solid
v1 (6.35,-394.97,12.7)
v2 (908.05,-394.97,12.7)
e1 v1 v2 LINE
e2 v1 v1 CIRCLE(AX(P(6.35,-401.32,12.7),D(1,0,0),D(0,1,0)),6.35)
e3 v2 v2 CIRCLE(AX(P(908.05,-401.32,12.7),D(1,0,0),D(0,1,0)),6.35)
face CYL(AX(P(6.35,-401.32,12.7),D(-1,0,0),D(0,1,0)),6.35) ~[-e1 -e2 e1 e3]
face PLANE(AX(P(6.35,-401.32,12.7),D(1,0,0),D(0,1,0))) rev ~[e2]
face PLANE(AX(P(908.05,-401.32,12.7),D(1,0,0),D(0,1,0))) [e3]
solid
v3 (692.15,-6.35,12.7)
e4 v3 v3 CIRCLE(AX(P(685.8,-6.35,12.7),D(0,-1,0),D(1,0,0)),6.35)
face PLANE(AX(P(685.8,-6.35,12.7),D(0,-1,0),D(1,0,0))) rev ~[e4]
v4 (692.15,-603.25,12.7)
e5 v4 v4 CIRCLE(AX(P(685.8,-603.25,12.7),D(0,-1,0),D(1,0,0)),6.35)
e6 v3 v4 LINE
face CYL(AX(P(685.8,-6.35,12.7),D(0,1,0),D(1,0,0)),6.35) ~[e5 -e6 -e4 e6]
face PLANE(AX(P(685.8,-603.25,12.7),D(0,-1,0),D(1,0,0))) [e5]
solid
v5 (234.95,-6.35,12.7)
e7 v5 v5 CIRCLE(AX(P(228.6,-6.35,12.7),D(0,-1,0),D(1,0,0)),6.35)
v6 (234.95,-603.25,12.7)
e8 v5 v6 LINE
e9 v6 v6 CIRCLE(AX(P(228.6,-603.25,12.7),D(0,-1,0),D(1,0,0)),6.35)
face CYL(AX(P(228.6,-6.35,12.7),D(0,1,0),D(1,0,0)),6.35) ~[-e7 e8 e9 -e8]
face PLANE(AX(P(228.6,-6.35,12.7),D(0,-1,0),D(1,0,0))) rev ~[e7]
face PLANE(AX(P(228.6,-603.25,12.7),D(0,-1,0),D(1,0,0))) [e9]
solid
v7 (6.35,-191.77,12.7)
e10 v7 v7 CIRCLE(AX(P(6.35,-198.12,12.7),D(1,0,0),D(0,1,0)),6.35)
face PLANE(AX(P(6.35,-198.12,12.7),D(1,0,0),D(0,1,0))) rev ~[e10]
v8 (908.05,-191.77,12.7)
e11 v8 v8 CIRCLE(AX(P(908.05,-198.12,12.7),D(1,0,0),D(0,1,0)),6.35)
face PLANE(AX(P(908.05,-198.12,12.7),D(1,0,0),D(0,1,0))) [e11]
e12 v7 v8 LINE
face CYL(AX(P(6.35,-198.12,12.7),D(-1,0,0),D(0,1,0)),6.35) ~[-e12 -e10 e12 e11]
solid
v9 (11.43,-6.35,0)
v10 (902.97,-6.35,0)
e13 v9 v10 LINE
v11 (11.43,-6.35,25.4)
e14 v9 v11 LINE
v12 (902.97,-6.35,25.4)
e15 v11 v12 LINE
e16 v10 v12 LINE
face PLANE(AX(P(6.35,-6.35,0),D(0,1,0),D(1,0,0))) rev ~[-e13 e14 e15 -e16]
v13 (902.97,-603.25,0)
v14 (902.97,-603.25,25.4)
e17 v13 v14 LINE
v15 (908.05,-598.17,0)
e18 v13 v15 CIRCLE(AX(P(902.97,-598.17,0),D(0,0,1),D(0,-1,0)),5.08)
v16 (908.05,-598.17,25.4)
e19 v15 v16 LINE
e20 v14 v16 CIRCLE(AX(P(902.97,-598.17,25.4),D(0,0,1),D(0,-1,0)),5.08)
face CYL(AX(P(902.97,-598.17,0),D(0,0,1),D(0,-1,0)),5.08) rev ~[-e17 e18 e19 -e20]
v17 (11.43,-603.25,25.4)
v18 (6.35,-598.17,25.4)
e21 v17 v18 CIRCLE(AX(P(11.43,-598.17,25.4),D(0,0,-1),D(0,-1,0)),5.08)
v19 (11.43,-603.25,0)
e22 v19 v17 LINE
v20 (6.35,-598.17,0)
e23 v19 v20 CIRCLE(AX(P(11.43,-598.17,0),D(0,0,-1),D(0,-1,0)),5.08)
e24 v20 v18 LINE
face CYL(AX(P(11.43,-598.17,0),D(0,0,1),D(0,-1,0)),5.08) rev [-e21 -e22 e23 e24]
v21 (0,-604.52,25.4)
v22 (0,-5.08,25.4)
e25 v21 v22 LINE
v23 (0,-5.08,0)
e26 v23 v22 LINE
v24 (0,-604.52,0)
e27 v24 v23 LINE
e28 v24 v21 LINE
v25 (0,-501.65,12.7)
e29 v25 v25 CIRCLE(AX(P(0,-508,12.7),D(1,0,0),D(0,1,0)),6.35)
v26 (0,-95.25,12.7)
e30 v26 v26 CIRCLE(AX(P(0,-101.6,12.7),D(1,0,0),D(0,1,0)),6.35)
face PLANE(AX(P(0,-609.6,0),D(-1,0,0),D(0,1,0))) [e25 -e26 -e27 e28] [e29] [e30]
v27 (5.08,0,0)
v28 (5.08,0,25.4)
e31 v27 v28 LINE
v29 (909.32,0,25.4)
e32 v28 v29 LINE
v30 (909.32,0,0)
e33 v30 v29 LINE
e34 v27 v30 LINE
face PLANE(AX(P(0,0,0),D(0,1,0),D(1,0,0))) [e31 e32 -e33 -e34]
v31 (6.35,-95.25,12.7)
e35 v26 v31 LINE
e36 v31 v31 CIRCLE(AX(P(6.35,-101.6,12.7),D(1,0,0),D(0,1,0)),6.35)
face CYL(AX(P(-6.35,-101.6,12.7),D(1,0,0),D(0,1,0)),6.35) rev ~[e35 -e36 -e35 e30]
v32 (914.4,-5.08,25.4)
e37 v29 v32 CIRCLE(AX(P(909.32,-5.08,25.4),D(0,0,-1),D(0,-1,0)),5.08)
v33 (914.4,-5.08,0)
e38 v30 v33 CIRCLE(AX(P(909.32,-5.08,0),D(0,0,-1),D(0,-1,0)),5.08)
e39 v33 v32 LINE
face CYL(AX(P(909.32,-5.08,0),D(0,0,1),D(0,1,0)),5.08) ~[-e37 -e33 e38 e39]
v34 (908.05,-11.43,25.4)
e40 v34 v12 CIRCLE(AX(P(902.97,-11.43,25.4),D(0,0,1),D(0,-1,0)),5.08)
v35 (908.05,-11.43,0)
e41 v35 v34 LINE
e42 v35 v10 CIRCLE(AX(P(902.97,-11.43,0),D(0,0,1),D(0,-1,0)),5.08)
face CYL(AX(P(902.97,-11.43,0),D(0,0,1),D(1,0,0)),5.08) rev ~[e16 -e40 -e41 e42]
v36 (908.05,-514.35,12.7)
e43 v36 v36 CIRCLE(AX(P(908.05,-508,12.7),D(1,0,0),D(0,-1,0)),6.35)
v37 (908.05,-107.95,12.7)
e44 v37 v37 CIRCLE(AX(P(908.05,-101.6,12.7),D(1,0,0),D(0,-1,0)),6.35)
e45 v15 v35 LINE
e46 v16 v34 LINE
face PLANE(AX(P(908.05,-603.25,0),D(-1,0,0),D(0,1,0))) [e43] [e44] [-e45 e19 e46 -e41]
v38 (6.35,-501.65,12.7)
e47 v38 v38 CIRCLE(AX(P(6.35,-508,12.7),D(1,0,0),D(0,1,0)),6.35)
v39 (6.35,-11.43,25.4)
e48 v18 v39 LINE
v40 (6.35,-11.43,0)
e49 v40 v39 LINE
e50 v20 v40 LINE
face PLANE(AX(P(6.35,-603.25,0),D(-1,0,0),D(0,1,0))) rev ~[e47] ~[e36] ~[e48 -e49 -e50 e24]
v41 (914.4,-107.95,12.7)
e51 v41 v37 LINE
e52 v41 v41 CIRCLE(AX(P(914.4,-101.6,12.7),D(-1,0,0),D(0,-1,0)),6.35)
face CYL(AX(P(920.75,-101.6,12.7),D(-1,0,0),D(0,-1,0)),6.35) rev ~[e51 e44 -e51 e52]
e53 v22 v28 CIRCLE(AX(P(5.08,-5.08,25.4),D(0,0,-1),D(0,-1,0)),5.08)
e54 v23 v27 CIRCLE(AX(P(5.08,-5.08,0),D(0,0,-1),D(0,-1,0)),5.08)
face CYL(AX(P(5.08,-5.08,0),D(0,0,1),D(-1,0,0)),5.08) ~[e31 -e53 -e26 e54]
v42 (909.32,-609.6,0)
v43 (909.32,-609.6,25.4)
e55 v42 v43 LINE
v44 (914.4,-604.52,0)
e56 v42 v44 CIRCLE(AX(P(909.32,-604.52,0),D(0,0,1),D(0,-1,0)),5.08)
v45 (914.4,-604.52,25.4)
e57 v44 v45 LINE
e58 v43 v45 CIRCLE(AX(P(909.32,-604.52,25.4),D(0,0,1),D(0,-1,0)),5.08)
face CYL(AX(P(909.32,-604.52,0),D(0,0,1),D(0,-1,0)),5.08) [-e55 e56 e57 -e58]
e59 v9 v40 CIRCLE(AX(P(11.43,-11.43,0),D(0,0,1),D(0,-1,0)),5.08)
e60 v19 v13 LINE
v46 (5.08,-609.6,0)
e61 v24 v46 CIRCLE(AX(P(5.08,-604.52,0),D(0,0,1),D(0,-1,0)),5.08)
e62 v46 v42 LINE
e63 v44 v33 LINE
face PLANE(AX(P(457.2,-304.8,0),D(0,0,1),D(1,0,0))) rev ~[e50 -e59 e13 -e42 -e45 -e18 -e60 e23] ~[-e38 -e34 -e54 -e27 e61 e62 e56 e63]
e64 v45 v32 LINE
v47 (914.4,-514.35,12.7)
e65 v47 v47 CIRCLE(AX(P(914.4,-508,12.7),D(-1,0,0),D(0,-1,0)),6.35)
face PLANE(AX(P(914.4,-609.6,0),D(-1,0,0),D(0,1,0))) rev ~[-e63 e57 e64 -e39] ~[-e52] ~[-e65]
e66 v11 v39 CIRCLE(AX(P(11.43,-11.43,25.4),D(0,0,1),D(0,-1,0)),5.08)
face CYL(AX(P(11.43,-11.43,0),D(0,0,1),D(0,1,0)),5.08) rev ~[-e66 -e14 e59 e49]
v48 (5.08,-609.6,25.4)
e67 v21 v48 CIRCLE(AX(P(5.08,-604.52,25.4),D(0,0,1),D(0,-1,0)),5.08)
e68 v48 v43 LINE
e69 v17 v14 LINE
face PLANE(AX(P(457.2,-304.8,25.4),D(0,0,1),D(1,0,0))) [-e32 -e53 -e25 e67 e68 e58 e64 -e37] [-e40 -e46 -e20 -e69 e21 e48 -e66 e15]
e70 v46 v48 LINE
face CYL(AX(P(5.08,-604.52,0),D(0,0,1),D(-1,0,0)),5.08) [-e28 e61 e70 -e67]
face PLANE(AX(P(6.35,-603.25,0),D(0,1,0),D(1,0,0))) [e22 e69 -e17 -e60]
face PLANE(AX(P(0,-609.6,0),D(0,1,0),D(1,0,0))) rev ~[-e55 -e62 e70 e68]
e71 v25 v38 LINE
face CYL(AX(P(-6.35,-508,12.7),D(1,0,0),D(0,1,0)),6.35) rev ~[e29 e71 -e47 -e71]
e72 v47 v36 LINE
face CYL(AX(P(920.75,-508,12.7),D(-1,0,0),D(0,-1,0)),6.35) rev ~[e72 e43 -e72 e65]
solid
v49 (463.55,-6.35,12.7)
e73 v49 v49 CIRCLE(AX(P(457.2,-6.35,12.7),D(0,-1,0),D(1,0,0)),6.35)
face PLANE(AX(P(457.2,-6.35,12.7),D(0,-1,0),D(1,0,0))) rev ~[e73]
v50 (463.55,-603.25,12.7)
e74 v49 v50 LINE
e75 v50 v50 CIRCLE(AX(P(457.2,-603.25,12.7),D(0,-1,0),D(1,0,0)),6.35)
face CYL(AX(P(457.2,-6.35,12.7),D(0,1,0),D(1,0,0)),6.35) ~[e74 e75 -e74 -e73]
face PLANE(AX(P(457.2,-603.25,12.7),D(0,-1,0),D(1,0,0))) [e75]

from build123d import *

# Parameters (mm, degrees)
F0_W      = 914.4
F0_H      = 609.6
F0_W_2    = 901.7
F0_H_2    = 596.9
F1_DEPTH  = 25.4
F2_R      = 5.08
F3_R      = 6.35
F4_DEPTH  = 901.7
F5_R      = 6.35
F6_DEPTH  = 596.9
F8_D      = 12.7
F8_DEPTH  = 6.35
F8_TIP    = 3.8154649308
F10_D     = 12.7
F10_DEPTH = 6.35
F10_TIP   = 3.8154649308


# Not quite as in the source:
# - a length typed as a fraction of an inch, garbled in the dataset ("3 / 203.2 mm" for 3/8 in), is restored


with BuildPart() as f1:
    # F0 (on Top) → F1 (new body)
    with BuildSketch(Plane.XY):
        with Locations((457.2, -304.8)):
            Rectangle(F0_W, F0_H)
        with Locations((457.2, -304.8)):
            Rectangle(F0_W_2, F0_H_2, mode=Mode.SUBTRACT)
    extrude(amount=F1_DEPTH)

    # F2
    f2_edges = [f1.edges().sort_by_distance(p)[0] for p in [
        (914.4, 0, 12.7),
        (908.05, -603.25, 12.7),
        (0, 0, 12.7),
        (6.35, -603.25, 12.7),
        (914.4, -609.6, 12.7),
        (0, -609.6, 12.7),
        (908.05, -6.35, 12.7),
        (6.35, -6.35, 12.7),
    ]]
    fillet(f2_edges, radius=F2_R)

    # F8
    with Locations(Plane(origin=(0, 0, 0), x_dir=(0, -1, 0), z_dir=(-1, 0, 0))):
        with Locations((101.6, 12.7), (508, 12.7)):
            Hole(F8_D / 2, depth=F8_DEPTH)
            with Locations((0, 0, -(F8_DEPTH + F8_TIP / 2))):  # 118° drill point
                Cone(0, F8_D / 2, F8_TIP, mode=Mode.SUBTRACT)

    # F10
    with Locations(Plane.YZ.offset(914.4)):
        with Locations((-508, 12.7), (-101.6, 12.7)):
            Hole(F10_D / 2, depth=F10_DEPTH)
            with Locations((0, 0, -(F10_DEPTH + F10_TIP / 2))):  # 118° drill point
                Cone(0, F10_D / 2, F10_TIP, mode=Mode.SUBTRACT)


with BuildPart() as f4:
    # F3 (on face) → F4 (new body, through all)
    with BuildSketch(Plane.YZ.offset(6.35)):
        with Locations((-401.32, 12.7)):
            Circle(F3_R)
    extrude(amount=F4_DEPTH)


with BuildPart() as f4b:
    # F3 (on face) → F4, piece 2 (new body, through all)
    with BuildSketch(Plane.YZ.offset(6.35)):
        with Locations((-198.12, 12.7)):
            Circle(F3_R)
    extrude(amount=F4_DEPTH)


with BuildPart() as f6:
    # F5 (on face) → F6 (new body, through all)
    with BuildSketch(Plane.XZ.offset(6.35)):
        with Locations((228.6, 12.7)):
            Circle(F5_R)
    extrude(amount=F6_DEPTH)


with BuildPart() as f6b:
    # F5 (on face) → F6, piece 2 (new body, through all)
    with BuildSketch(Plane.XZ.offset(6.35)):
        with Locations((457.2, 12.7)):
            Circle(F5_R)
    extrude(amount=F6_DEPTH)


with BuildPart() as f6c:
    # F5 (on face) → F6, piece 3 (new body, through all)
    with BuildSketch(Plane.XZ.offset(6.35)):
        with Locations((685.8, 12.7)):
            Circle(F5_R)
    extrude(amount=F6_DEPTH)


solid = Compound([f1.part, f4.part, f4b.part, f6.part, f6b.part, f6c.part])
